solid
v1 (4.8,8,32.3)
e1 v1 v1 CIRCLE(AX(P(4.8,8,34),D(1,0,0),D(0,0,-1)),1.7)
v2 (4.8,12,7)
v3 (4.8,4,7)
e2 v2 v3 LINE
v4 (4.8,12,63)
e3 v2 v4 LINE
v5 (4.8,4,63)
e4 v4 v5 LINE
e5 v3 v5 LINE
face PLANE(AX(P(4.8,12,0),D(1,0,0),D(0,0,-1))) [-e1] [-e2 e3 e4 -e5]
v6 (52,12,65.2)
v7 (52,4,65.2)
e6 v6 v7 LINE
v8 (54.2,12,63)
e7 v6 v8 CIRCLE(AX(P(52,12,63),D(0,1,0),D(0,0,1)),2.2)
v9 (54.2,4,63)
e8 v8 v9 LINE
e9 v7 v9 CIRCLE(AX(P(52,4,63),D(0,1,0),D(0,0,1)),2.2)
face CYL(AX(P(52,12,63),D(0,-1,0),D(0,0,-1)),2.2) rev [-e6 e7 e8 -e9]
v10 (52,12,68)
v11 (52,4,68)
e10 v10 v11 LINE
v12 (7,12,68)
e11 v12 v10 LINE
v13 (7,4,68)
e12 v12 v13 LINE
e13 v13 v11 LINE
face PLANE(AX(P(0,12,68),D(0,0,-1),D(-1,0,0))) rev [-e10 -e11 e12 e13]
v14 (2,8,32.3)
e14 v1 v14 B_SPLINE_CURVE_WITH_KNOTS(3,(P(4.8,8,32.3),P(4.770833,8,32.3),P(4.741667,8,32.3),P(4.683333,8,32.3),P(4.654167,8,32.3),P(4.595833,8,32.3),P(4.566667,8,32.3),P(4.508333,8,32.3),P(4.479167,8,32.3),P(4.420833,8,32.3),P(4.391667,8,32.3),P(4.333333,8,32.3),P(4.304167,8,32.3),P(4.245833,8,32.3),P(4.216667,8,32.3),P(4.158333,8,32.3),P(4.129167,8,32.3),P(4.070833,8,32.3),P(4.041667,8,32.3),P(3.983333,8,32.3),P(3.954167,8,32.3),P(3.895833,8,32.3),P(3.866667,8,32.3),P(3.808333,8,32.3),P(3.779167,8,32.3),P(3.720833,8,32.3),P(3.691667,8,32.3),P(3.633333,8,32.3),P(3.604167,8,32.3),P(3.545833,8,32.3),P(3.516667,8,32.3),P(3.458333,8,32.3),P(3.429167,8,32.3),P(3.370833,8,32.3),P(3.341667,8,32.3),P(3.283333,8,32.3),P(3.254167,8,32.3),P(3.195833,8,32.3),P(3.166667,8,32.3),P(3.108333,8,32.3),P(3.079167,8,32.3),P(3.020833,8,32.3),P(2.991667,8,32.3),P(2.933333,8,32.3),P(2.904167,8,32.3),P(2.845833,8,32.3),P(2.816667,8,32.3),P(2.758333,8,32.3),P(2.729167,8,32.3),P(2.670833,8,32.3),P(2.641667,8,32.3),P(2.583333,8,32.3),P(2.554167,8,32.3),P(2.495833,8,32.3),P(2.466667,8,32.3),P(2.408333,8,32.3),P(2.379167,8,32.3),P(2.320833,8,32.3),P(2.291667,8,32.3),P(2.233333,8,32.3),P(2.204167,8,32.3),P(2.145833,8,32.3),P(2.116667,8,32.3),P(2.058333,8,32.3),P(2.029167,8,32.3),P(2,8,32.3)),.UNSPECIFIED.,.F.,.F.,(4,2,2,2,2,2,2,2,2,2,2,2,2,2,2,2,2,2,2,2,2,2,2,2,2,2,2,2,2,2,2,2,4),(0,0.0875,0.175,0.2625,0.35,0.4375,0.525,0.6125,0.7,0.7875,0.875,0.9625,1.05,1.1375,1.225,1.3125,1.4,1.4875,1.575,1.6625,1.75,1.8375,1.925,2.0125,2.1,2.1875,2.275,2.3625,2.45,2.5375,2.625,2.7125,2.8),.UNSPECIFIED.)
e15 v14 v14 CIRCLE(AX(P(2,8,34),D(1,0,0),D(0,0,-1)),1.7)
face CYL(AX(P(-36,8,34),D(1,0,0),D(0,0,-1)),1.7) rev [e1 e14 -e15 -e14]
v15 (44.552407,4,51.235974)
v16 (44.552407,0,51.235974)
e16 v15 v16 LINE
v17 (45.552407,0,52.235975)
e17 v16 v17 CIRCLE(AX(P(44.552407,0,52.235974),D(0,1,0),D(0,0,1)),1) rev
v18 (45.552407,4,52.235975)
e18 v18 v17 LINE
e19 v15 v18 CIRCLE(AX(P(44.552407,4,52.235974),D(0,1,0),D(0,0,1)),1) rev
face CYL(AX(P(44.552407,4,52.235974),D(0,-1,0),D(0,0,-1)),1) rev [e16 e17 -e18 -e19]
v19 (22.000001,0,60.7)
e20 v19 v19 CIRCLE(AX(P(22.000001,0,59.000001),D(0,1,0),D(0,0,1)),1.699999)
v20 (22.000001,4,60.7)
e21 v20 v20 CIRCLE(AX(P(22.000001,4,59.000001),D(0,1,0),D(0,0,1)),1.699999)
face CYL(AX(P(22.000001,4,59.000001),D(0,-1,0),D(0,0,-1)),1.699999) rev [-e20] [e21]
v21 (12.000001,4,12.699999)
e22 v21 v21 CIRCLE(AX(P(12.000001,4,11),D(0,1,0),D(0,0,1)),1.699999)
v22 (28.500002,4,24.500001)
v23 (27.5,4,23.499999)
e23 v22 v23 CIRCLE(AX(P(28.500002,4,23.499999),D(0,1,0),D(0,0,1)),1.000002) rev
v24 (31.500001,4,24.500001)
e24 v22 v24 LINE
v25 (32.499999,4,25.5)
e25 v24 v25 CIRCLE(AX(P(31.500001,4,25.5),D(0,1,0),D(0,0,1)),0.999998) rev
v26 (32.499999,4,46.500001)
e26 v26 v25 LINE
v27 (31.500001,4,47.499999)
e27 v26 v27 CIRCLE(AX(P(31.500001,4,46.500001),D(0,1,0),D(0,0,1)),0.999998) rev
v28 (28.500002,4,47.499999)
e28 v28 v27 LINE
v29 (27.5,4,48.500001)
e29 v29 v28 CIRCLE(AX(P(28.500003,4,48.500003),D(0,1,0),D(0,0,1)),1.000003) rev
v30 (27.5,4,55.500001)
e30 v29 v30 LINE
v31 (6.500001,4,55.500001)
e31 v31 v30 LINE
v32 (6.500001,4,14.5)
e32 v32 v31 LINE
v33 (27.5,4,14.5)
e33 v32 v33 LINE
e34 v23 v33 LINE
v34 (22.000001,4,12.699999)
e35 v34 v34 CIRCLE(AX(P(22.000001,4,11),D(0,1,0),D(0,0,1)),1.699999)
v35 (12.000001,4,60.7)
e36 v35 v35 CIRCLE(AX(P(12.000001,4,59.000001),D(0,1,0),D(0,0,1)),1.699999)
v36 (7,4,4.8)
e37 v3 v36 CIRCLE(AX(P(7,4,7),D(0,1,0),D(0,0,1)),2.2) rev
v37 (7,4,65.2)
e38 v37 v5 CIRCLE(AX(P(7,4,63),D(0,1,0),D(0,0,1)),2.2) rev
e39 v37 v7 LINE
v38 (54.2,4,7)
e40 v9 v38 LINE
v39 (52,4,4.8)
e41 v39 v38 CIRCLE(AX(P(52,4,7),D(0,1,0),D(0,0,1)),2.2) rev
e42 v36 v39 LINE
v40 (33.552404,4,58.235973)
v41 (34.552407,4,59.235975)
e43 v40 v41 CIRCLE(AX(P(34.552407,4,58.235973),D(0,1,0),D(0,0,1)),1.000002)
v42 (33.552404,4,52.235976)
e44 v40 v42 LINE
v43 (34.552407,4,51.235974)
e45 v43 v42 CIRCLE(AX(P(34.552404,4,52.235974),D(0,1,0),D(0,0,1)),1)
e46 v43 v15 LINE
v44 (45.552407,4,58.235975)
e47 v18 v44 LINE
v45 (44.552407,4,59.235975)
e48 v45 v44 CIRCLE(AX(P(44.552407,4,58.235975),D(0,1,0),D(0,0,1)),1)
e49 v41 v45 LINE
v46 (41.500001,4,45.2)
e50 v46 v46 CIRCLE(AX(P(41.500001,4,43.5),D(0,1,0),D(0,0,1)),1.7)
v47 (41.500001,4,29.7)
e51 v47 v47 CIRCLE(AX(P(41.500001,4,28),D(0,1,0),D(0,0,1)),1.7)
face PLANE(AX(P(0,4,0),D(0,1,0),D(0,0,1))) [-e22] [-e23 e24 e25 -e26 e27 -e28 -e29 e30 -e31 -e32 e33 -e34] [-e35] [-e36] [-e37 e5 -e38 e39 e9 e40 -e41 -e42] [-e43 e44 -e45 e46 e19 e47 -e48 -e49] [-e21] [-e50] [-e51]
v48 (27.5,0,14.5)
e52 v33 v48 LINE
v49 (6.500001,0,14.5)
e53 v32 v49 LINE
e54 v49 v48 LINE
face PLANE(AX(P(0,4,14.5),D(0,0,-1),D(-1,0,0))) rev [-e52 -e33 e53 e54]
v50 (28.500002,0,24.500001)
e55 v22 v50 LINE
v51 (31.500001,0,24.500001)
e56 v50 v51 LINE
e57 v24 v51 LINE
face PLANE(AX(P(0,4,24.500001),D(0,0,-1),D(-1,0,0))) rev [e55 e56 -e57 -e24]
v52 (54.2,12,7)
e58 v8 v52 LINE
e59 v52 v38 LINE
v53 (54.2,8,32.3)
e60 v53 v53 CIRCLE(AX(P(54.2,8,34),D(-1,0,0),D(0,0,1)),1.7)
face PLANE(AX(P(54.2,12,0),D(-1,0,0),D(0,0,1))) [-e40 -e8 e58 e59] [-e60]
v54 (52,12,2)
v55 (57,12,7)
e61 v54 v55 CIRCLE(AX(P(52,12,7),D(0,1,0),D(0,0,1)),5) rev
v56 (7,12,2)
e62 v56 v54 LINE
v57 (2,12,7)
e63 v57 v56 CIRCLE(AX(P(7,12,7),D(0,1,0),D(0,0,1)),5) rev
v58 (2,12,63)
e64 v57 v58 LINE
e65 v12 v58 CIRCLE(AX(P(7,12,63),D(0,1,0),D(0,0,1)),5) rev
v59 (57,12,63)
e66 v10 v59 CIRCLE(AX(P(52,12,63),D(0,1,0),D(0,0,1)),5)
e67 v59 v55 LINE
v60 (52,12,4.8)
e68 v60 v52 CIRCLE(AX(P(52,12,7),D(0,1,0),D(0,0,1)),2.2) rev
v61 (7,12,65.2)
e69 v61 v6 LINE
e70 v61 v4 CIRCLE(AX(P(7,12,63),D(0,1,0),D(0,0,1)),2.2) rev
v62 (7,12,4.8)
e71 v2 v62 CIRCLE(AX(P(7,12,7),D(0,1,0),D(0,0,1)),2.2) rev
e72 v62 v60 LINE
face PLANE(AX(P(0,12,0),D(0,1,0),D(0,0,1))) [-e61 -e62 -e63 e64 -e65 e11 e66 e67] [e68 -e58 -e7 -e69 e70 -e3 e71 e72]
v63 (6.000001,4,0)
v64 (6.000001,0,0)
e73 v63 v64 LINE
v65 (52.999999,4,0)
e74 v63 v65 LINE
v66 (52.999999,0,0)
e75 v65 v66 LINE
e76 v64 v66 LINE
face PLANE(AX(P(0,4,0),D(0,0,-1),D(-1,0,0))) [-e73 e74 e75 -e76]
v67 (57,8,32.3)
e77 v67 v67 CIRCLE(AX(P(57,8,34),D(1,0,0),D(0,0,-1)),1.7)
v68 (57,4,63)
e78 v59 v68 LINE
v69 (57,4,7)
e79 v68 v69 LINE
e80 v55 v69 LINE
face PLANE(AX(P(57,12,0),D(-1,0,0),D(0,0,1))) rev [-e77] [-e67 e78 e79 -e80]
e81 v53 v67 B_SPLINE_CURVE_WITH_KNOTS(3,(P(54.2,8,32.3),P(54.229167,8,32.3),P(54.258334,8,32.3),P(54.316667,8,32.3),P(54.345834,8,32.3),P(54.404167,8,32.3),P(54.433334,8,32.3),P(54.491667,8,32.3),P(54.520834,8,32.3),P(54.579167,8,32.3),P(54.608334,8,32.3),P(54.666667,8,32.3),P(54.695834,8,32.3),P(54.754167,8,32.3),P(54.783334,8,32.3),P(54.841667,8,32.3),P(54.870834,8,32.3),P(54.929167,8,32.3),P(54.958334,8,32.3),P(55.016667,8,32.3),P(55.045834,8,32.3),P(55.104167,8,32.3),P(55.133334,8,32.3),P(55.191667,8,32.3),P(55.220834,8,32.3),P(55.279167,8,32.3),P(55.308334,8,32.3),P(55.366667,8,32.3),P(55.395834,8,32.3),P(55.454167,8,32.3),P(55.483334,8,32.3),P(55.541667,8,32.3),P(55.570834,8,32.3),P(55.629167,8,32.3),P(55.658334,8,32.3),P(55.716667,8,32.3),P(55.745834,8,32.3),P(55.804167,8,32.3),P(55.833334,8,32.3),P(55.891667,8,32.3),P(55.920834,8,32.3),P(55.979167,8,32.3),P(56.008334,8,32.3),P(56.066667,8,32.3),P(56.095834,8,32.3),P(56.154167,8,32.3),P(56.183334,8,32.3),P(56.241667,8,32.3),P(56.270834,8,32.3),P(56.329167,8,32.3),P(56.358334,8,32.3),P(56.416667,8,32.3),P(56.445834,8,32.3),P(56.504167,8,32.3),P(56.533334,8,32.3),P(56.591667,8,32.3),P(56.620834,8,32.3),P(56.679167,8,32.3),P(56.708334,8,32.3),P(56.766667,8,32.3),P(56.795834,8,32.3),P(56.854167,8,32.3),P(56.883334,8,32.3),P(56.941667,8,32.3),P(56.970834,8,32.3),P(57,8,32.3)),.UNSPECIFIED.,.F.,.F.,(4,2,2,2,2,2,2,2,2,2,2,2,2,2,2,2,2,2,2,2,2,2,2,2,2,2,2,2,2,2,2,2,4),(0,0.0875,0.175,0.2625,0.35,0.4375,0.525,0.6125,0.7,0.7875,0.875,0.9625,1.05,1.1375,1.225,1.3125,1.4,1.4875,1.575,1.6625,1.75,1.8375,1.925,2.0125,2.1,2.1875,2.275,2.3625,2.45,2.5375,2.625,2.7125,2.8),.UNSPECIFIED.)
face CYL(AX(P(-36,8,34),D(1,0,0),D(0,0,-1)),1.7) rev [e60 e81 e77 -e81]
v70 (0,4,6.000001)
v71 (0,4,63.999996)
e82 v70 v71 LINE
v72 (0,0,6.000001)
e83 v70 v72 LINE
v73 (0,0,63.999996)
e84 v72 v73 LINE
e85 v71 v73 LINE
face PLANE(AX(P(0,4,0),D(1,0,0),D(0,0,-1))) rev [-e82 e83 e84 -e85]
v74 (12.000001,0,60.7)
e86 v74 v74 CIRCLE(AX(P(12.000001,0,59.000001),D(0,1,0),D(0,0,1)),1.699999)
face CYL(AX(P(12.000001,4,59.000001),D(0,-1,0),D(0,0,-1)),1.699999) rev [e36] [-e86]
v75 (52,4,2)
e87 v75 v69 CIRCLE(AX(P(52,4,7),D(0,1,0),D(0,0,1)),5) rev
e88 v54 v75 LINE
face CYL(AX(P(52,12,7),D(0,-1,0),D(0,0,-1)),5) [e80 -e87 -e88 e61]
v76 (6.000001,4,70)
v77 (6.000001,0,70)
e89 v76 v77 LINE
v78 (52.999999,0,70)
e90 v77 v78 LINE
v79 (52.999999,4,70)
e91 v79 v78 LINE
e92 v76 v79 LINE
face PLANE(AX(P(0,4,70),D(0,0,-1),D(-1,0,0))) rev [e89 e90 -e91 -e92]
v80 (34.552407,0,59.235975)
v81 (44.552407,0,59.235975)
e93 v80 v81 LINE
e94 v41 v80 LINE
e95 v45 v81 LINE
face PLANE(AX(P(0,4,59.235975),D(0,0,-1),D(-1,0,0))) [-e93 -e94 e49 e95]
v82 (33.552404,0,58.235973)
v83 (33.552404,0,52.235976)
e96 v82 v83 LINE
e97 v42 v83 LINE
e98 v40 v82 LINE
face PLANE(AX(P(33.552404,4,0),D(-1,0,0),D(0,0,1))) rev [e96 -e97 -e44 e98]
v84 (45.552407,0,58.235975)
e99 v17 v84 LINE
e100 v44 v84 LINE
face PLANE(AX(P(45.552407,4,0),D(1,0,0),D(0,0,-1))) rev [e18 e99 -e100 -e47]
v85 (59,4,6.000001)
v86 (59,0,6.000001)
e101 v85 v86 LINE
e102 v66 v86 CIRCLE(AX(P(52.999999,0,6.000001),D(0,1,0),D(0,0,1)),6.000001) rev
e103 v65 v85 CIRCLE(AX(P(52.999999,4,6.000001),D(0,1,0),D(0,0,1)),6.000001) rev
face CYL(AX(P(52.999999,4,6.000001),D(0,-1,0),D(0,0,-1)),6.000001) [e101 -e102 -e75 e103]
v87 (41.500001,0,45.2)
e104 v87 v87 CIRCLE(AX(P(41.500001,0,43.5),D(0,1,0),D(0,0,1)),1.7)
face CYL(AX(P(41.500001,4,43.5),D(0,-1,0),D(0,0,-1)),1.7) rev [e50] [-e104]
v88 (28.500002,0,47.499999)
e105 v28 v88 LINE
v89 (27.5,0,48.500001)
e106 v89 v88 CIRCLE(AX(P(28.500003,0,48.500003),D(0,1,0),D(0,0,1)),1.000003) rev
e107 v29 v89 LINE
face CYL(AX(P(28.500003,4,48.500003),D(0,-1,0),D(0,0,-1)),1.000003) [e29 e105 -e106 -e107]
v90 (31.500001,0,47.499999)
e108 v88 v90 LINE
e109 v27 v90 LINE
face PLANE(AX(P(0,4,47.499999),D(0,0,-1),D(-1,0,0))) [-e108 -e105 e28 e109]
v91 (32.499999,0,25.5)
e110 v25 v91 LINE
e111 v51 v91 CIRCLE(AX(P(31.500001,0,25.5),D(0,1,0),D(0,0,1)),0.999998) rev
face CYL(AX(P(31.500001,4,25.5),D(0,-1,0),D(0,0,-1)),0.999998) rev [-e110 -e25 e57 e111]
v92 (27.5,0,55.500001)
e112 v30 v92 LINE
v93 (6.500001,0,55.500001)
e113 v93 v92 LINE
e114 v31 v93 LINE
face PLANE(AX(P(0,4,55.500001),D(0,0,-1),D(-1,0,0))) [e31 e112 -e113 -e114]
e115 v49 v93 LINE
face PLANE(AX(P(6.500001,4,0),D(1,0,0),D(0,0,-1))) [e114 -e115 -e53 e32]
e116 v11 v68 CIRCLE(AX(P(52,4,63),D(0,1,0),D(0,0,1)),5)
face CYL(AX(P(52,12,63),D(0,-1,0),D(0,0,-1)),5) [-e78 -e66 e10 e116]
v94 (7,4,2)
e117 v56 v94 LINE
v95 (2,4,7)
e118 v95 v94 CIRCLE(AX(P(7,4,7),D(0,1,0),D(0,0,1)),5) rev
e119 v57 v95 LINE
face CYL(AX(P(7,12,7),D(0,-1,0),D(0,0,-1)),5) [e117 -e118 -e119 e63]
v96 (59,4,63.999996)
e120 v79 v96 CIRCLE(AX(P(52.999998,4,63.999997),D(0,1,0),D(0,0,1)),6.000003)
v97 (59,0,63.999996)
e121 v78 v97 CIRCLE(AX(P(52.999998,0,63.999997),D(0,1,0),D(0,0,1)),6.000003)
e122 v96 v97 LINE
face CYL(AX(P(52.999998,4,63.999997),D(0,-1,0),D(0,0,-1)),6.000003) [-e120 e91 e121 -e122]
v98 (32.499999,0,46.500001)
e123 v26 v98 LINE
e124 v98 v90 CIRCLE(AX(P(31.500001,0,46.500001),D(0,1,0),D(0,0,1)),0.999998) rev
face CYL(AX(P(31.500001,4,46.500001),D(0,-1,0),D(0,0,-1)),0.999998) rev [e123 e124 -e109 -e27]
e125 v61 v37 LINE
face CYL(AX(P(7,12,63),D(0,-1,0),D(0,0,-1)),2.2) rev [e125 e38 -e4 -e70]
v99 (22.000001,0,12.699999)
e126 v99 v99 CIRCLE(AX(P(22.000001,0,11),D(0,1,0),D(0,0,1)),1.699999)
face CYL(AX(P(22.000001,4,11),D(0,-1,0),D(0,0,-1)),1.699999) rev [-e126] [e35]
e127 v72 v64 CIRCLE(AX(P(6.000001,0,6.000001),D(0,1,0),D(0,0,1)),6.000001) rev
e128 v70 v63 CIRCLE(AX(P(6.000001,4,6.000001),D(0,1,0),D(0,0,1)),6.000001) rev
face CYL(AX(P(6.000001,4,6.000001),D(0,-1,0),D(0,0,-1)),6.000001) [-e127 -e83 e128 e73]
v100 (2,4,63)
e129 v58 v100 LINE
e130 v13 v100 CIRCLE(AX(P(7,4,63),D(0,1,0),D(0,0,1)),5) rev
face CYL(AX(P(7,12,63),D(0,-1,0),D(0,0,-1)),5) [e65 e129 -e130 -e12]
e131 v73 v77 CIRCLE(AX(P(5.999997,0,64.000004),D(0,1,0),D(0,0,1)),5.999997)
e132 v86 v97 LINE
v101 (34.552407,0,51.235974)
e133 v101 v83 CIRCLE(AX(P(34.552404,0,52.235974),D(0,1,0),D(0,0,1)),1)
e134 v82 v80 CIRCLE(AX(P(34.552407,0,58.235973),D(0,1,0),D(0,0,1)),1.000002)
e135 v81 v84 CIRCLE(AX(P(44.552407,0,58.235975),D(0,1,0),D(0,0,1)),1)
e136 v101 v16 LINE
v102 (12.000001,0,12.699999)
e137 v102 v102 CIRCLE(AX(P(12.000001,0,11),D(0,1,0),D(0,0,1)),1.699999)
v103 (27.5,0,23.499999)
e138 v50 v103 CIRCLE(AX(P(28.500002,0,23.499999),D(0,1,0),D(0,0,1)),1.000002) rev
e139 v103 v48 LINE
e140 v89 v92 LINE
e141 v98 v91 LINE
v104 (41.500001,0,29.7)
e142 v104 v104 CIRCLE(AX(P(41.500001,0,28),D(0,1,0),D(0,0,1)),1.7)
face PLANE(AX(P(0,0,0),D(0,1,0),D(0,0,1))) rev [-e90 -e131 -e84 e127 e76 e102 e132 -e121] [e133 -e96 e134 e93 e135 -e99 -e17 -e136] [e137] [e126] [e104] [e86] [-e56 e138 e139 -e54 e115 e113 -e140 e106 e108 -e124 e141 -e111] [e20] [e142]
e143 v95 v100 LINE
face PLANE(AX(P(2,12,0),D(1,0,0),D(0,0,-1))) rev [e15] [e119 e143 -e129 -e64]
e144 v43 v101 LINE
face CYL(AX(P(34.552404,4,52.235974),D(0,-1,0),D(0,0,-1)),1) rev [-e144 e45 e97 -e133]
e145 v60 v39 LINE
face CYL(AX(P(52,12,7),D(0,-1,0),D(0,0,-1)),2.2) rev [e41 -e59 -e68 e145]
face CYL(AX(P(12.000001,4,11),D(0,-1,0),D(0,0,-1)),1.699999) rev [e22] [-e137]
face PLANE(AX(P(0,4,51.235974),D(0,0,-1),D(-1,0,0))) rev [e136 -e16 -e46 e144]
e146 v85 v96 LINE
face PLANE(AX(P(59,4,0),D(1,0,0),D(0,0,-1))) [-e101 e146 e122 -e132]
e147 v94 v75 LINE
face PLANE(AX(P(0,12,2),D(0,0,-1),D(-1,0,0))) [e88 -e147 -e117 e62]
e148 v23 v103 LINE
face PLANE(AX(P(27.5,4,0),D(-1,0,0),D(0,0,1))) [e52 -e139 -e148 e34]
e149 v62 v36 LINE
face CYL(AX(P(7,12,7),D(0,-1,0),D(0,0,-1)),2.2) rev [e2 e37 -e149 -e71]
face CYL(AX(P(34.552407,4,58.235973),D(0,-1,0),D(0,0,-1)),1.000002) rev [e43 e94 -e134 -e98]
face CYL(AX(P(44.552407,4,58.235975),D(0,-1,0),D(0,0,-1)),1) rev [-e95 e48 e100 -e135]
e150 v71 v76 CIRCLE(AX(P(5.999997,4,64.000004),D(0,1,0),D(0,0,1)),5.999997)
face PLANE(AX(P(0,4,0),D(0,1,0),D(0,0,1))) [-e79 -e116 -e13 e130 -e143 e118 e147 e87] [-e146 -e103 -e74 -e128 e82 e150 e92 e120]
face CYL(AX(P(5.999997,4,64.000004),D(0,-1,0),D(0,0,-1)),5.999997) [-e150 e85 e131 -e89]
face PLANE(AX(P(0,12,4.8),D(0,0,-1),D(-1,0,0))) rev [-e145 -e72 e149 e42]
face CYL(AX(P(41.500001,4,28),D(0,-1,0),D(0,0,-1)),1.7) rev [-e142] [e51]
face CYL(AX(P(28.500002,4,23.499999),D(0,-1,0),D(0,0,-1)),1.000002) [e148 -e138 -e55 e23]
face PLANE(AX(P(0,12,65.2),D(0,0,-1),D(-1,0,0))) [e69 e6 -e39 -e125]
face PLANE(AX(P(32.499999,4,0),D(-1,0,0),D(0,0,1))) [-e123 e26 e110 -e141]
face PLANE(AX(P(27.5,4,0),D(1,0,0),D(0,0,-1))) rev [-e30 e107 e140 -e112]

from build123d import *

# Parameters (mm, degrees)
SKETCH2_R           = 1.699999062
SKETCH2_R_2         = 1.69999994
BOSS_EXTRUDE1_DEPTH = 4
BOSS_EXTRUDE2_DEPTH = 8
SKETCH4_R           = 1.7
CUT_EXTRUDE1_DEPTH  = 93


# Read off the part's stored shape, not the designer's step: Surface-Imported1
with BuildPart() as part:
    # Sketch2 → Boss-Extrude1 (new body)
    with BuildSketch(Plane(origin=(0, 0, 0), x_dir=(1, 0, 0), z_dir=(0, 1, 0))):
        with BuildLine():
            Line((6.000000983, 0), (52.999999374, 0))
            ThreePointArc((52.999999374, 0), (57.242640757, -1.757359601), (59.000000358, -6.000000983))
            Line((59.000000358, -6.000000983), (59.000000358, -63.999995589))
            ThreePointArc((59.000000358, -63.999995589), (57.242641528, -68.242638834), (52.999999374, -70.000000298))
            Line((52.999999374, -70.000000298), (6.000000983, -70.000000298))
            ThreePointArc((6.000000983, -70.000000298), (1.75735699, -68.242640674), (0, -63.999995589))
            Line((0, -63.999995589), (0, -6.000000983))
            ThreePointArc((0, -6.000000983), (1.757359601, -1.757359601), (6.000000983, 0))
        make_face()
        with Locations(Location((12.000001036, -10.99999994, 0), (0, 0, 270))):
            Circle(SKETCH2_R, mode=Mode.SUBTRACT)
        with Locations(Location((22.000001036, -10.99999994, 0), (0, 0, 270))):
            Circle(SKETCH2_R, mode=Mode.SUBTRACT)
        with Locations(Location((22.000001036, -59.000000715, 0), (0, 0, 270))):
            Circle(SKETCH2_R, mode=Mode.SUBTRACT)
        with Locations(Location((12.000001036, -59.000000715, 0), (0, 0, 270))):
            Circle(SKETCH2_R, mode=Mode.SUBTRACT)
        with Locations(Location((41.50000118, -27.999999899, 0), (0, 0, 270))):
            Circle(SKETCH2_R_2, mode=Mode.SUBTRACT)
        with Locations(Location((41.50000118, -43.499999899, 0), (0, 0, 270))):
            Circle(SKETCH2_R_2, mode=Mode.SUBTRACT)
        with BuildLine():
            Line((32.499998808, -46.500001103), (32.499998808, -25.499999523))
            ThreePointArc((32.499998808, -25.499999523), (32.207106087, -24.792893943), (31.500000507, -24.500001222))
            Line((31.500000507, -24.500001222), (28.500001878, -24.500001222))
            ThreePointArc((28.500001878, -24.500001222), (27.792893663, -24.20710741), (27.499999851, -23.499999195))
            Line((27.499999851, -23.499999195), (27.499999851, -14.499999583))
            Line((27.499999851, -14.499999583), (6.500001065, -14.499999583))
            Line((6.500001065, -14.499999583), (6.500001065, -55.500000715))
            Line((6.500001065, -55.500000715), (27.499999851, -55.500000715))
            Line((27.499999851, -55.500000715), (27.499999851, -48.500001431))
            ThreePointArc((27.499999851, -48.500001431), (27.792894046, -47.792893599), (28.500001878, -47.499999404))
            Line((28.500001878, -47.499999404), (31.500000507, -47.499999404))
            ThreePointArc((31.500000507, -47.499999404), (32.207106087, -47.207106683), (32.499998808, -46.500001103))
        make_face(mode=Mode.SUBTRACT)
        with BuildLine():
            Line((34.55240652, -51.235973835), (44.55240652, -51.235973835))
            ThreePointArc((44.55240652, -51.235973835), (45.259513765, -51.528867517), (45.55240652, -52.235975146))
            Line((45.55240652, -52.235975146), (45.55240652, -58.235975146))
            ThreePointArc((45.55240652, -58.235975146), (45.259513301, -58.943081927), (44.55240652, -59.235975146))
            Line((44.55240652, -59.235975146), (34.55240652, -59.235975146))
            ThreePointArc((34.55240652, -59.235975146), (33.845298305, -58.943081334), (33.552404493, -58.23597312))
            Line((33.552404493, -58.23597312), (33.552404493, -52.235975862))
            ThreePointArc((33.552404493, -52.235975862), (33.845297712, -51.528867054), (34.55240652, -51.235973835))
        make_face(mode=Mode.SUBTRACT)
    extrude(amount=BOSS_EXTRUDE1_DEPTH)

    # Sketch3 → Boss-Extrude2 (add)
    with BuildSketch(Plane(origin=(0, 4, 0), x_dir=(1, 0, 0), z_dir=(0, 1, 0))):
        with BuildLine():
            Line((2, -7), (2, -63.000000298))
            ThreePointArc((2, -63.000000298), (3.464466094, -66.535534204), (7, -68.000000298))
            Line((7, -68.000000298), (52.000000358, -68.000000298))
            ThreePointArc((52.000000358, -68.000000298), (55.535534264, -66.535534204), (57.000000358, -63.000000298))
            Line((57.000000358, -63.000000298), (57.000000358, -7))
            ThreePointArc((57.000000358, -7), (55.535534264, -3.464466094), (52.000000358, -2))
            Line((52.000000358, -2), (7, -2))
            ThreePointArc((7, -2), (3.464466094, -3.464466094), (2, -7))
        make_face()
        with BuildLine():
            Line((4.8, -7), (4.8, -63.000000298))
            ThreePointArc((4.8, -63.000000298), (5.444365081, -64.555635217), (7, -65.200000298))
            Line((7, -65.200000298), (52.000000358, -65.200000298))
            ThreePointArc((52.000000358, -65.200000298), (53.555635276, -64.555635217), (54.200000358, -63.000000298))
            Line((54.200000358, -63.000000298), (54.200000358, -7))
            ThreePointArc((54.200000358, -7), (53.555635276, -5.444365081), (52.000000358, -4.8))
            Line((52.000000358, -4.8), (7, -4.8))
            ThreePointArc((7, -4.8), (5.444365081, -5.444365081), (4.8, -7))
        make_face(mode=Mode.SUBTRACT)
    extrude(amount=BOSS_EXTRUDE2_DEPTH)

    # Sketch4 → Cut-Extrude1 (cut)
    with BuildSketch(Plane(origin=(57.000000358, 0, 0), x_dir=(0, 0, -1), z_dir=(1, 0, 0))):
        with Locations((-34.000000298, 8)):
            Circle(SKETCH4_R)
    extrude(amount=-CUT_EXTRUDE1_DEPTH, mode=Mode.SUBTRACT)


solid = part.part
